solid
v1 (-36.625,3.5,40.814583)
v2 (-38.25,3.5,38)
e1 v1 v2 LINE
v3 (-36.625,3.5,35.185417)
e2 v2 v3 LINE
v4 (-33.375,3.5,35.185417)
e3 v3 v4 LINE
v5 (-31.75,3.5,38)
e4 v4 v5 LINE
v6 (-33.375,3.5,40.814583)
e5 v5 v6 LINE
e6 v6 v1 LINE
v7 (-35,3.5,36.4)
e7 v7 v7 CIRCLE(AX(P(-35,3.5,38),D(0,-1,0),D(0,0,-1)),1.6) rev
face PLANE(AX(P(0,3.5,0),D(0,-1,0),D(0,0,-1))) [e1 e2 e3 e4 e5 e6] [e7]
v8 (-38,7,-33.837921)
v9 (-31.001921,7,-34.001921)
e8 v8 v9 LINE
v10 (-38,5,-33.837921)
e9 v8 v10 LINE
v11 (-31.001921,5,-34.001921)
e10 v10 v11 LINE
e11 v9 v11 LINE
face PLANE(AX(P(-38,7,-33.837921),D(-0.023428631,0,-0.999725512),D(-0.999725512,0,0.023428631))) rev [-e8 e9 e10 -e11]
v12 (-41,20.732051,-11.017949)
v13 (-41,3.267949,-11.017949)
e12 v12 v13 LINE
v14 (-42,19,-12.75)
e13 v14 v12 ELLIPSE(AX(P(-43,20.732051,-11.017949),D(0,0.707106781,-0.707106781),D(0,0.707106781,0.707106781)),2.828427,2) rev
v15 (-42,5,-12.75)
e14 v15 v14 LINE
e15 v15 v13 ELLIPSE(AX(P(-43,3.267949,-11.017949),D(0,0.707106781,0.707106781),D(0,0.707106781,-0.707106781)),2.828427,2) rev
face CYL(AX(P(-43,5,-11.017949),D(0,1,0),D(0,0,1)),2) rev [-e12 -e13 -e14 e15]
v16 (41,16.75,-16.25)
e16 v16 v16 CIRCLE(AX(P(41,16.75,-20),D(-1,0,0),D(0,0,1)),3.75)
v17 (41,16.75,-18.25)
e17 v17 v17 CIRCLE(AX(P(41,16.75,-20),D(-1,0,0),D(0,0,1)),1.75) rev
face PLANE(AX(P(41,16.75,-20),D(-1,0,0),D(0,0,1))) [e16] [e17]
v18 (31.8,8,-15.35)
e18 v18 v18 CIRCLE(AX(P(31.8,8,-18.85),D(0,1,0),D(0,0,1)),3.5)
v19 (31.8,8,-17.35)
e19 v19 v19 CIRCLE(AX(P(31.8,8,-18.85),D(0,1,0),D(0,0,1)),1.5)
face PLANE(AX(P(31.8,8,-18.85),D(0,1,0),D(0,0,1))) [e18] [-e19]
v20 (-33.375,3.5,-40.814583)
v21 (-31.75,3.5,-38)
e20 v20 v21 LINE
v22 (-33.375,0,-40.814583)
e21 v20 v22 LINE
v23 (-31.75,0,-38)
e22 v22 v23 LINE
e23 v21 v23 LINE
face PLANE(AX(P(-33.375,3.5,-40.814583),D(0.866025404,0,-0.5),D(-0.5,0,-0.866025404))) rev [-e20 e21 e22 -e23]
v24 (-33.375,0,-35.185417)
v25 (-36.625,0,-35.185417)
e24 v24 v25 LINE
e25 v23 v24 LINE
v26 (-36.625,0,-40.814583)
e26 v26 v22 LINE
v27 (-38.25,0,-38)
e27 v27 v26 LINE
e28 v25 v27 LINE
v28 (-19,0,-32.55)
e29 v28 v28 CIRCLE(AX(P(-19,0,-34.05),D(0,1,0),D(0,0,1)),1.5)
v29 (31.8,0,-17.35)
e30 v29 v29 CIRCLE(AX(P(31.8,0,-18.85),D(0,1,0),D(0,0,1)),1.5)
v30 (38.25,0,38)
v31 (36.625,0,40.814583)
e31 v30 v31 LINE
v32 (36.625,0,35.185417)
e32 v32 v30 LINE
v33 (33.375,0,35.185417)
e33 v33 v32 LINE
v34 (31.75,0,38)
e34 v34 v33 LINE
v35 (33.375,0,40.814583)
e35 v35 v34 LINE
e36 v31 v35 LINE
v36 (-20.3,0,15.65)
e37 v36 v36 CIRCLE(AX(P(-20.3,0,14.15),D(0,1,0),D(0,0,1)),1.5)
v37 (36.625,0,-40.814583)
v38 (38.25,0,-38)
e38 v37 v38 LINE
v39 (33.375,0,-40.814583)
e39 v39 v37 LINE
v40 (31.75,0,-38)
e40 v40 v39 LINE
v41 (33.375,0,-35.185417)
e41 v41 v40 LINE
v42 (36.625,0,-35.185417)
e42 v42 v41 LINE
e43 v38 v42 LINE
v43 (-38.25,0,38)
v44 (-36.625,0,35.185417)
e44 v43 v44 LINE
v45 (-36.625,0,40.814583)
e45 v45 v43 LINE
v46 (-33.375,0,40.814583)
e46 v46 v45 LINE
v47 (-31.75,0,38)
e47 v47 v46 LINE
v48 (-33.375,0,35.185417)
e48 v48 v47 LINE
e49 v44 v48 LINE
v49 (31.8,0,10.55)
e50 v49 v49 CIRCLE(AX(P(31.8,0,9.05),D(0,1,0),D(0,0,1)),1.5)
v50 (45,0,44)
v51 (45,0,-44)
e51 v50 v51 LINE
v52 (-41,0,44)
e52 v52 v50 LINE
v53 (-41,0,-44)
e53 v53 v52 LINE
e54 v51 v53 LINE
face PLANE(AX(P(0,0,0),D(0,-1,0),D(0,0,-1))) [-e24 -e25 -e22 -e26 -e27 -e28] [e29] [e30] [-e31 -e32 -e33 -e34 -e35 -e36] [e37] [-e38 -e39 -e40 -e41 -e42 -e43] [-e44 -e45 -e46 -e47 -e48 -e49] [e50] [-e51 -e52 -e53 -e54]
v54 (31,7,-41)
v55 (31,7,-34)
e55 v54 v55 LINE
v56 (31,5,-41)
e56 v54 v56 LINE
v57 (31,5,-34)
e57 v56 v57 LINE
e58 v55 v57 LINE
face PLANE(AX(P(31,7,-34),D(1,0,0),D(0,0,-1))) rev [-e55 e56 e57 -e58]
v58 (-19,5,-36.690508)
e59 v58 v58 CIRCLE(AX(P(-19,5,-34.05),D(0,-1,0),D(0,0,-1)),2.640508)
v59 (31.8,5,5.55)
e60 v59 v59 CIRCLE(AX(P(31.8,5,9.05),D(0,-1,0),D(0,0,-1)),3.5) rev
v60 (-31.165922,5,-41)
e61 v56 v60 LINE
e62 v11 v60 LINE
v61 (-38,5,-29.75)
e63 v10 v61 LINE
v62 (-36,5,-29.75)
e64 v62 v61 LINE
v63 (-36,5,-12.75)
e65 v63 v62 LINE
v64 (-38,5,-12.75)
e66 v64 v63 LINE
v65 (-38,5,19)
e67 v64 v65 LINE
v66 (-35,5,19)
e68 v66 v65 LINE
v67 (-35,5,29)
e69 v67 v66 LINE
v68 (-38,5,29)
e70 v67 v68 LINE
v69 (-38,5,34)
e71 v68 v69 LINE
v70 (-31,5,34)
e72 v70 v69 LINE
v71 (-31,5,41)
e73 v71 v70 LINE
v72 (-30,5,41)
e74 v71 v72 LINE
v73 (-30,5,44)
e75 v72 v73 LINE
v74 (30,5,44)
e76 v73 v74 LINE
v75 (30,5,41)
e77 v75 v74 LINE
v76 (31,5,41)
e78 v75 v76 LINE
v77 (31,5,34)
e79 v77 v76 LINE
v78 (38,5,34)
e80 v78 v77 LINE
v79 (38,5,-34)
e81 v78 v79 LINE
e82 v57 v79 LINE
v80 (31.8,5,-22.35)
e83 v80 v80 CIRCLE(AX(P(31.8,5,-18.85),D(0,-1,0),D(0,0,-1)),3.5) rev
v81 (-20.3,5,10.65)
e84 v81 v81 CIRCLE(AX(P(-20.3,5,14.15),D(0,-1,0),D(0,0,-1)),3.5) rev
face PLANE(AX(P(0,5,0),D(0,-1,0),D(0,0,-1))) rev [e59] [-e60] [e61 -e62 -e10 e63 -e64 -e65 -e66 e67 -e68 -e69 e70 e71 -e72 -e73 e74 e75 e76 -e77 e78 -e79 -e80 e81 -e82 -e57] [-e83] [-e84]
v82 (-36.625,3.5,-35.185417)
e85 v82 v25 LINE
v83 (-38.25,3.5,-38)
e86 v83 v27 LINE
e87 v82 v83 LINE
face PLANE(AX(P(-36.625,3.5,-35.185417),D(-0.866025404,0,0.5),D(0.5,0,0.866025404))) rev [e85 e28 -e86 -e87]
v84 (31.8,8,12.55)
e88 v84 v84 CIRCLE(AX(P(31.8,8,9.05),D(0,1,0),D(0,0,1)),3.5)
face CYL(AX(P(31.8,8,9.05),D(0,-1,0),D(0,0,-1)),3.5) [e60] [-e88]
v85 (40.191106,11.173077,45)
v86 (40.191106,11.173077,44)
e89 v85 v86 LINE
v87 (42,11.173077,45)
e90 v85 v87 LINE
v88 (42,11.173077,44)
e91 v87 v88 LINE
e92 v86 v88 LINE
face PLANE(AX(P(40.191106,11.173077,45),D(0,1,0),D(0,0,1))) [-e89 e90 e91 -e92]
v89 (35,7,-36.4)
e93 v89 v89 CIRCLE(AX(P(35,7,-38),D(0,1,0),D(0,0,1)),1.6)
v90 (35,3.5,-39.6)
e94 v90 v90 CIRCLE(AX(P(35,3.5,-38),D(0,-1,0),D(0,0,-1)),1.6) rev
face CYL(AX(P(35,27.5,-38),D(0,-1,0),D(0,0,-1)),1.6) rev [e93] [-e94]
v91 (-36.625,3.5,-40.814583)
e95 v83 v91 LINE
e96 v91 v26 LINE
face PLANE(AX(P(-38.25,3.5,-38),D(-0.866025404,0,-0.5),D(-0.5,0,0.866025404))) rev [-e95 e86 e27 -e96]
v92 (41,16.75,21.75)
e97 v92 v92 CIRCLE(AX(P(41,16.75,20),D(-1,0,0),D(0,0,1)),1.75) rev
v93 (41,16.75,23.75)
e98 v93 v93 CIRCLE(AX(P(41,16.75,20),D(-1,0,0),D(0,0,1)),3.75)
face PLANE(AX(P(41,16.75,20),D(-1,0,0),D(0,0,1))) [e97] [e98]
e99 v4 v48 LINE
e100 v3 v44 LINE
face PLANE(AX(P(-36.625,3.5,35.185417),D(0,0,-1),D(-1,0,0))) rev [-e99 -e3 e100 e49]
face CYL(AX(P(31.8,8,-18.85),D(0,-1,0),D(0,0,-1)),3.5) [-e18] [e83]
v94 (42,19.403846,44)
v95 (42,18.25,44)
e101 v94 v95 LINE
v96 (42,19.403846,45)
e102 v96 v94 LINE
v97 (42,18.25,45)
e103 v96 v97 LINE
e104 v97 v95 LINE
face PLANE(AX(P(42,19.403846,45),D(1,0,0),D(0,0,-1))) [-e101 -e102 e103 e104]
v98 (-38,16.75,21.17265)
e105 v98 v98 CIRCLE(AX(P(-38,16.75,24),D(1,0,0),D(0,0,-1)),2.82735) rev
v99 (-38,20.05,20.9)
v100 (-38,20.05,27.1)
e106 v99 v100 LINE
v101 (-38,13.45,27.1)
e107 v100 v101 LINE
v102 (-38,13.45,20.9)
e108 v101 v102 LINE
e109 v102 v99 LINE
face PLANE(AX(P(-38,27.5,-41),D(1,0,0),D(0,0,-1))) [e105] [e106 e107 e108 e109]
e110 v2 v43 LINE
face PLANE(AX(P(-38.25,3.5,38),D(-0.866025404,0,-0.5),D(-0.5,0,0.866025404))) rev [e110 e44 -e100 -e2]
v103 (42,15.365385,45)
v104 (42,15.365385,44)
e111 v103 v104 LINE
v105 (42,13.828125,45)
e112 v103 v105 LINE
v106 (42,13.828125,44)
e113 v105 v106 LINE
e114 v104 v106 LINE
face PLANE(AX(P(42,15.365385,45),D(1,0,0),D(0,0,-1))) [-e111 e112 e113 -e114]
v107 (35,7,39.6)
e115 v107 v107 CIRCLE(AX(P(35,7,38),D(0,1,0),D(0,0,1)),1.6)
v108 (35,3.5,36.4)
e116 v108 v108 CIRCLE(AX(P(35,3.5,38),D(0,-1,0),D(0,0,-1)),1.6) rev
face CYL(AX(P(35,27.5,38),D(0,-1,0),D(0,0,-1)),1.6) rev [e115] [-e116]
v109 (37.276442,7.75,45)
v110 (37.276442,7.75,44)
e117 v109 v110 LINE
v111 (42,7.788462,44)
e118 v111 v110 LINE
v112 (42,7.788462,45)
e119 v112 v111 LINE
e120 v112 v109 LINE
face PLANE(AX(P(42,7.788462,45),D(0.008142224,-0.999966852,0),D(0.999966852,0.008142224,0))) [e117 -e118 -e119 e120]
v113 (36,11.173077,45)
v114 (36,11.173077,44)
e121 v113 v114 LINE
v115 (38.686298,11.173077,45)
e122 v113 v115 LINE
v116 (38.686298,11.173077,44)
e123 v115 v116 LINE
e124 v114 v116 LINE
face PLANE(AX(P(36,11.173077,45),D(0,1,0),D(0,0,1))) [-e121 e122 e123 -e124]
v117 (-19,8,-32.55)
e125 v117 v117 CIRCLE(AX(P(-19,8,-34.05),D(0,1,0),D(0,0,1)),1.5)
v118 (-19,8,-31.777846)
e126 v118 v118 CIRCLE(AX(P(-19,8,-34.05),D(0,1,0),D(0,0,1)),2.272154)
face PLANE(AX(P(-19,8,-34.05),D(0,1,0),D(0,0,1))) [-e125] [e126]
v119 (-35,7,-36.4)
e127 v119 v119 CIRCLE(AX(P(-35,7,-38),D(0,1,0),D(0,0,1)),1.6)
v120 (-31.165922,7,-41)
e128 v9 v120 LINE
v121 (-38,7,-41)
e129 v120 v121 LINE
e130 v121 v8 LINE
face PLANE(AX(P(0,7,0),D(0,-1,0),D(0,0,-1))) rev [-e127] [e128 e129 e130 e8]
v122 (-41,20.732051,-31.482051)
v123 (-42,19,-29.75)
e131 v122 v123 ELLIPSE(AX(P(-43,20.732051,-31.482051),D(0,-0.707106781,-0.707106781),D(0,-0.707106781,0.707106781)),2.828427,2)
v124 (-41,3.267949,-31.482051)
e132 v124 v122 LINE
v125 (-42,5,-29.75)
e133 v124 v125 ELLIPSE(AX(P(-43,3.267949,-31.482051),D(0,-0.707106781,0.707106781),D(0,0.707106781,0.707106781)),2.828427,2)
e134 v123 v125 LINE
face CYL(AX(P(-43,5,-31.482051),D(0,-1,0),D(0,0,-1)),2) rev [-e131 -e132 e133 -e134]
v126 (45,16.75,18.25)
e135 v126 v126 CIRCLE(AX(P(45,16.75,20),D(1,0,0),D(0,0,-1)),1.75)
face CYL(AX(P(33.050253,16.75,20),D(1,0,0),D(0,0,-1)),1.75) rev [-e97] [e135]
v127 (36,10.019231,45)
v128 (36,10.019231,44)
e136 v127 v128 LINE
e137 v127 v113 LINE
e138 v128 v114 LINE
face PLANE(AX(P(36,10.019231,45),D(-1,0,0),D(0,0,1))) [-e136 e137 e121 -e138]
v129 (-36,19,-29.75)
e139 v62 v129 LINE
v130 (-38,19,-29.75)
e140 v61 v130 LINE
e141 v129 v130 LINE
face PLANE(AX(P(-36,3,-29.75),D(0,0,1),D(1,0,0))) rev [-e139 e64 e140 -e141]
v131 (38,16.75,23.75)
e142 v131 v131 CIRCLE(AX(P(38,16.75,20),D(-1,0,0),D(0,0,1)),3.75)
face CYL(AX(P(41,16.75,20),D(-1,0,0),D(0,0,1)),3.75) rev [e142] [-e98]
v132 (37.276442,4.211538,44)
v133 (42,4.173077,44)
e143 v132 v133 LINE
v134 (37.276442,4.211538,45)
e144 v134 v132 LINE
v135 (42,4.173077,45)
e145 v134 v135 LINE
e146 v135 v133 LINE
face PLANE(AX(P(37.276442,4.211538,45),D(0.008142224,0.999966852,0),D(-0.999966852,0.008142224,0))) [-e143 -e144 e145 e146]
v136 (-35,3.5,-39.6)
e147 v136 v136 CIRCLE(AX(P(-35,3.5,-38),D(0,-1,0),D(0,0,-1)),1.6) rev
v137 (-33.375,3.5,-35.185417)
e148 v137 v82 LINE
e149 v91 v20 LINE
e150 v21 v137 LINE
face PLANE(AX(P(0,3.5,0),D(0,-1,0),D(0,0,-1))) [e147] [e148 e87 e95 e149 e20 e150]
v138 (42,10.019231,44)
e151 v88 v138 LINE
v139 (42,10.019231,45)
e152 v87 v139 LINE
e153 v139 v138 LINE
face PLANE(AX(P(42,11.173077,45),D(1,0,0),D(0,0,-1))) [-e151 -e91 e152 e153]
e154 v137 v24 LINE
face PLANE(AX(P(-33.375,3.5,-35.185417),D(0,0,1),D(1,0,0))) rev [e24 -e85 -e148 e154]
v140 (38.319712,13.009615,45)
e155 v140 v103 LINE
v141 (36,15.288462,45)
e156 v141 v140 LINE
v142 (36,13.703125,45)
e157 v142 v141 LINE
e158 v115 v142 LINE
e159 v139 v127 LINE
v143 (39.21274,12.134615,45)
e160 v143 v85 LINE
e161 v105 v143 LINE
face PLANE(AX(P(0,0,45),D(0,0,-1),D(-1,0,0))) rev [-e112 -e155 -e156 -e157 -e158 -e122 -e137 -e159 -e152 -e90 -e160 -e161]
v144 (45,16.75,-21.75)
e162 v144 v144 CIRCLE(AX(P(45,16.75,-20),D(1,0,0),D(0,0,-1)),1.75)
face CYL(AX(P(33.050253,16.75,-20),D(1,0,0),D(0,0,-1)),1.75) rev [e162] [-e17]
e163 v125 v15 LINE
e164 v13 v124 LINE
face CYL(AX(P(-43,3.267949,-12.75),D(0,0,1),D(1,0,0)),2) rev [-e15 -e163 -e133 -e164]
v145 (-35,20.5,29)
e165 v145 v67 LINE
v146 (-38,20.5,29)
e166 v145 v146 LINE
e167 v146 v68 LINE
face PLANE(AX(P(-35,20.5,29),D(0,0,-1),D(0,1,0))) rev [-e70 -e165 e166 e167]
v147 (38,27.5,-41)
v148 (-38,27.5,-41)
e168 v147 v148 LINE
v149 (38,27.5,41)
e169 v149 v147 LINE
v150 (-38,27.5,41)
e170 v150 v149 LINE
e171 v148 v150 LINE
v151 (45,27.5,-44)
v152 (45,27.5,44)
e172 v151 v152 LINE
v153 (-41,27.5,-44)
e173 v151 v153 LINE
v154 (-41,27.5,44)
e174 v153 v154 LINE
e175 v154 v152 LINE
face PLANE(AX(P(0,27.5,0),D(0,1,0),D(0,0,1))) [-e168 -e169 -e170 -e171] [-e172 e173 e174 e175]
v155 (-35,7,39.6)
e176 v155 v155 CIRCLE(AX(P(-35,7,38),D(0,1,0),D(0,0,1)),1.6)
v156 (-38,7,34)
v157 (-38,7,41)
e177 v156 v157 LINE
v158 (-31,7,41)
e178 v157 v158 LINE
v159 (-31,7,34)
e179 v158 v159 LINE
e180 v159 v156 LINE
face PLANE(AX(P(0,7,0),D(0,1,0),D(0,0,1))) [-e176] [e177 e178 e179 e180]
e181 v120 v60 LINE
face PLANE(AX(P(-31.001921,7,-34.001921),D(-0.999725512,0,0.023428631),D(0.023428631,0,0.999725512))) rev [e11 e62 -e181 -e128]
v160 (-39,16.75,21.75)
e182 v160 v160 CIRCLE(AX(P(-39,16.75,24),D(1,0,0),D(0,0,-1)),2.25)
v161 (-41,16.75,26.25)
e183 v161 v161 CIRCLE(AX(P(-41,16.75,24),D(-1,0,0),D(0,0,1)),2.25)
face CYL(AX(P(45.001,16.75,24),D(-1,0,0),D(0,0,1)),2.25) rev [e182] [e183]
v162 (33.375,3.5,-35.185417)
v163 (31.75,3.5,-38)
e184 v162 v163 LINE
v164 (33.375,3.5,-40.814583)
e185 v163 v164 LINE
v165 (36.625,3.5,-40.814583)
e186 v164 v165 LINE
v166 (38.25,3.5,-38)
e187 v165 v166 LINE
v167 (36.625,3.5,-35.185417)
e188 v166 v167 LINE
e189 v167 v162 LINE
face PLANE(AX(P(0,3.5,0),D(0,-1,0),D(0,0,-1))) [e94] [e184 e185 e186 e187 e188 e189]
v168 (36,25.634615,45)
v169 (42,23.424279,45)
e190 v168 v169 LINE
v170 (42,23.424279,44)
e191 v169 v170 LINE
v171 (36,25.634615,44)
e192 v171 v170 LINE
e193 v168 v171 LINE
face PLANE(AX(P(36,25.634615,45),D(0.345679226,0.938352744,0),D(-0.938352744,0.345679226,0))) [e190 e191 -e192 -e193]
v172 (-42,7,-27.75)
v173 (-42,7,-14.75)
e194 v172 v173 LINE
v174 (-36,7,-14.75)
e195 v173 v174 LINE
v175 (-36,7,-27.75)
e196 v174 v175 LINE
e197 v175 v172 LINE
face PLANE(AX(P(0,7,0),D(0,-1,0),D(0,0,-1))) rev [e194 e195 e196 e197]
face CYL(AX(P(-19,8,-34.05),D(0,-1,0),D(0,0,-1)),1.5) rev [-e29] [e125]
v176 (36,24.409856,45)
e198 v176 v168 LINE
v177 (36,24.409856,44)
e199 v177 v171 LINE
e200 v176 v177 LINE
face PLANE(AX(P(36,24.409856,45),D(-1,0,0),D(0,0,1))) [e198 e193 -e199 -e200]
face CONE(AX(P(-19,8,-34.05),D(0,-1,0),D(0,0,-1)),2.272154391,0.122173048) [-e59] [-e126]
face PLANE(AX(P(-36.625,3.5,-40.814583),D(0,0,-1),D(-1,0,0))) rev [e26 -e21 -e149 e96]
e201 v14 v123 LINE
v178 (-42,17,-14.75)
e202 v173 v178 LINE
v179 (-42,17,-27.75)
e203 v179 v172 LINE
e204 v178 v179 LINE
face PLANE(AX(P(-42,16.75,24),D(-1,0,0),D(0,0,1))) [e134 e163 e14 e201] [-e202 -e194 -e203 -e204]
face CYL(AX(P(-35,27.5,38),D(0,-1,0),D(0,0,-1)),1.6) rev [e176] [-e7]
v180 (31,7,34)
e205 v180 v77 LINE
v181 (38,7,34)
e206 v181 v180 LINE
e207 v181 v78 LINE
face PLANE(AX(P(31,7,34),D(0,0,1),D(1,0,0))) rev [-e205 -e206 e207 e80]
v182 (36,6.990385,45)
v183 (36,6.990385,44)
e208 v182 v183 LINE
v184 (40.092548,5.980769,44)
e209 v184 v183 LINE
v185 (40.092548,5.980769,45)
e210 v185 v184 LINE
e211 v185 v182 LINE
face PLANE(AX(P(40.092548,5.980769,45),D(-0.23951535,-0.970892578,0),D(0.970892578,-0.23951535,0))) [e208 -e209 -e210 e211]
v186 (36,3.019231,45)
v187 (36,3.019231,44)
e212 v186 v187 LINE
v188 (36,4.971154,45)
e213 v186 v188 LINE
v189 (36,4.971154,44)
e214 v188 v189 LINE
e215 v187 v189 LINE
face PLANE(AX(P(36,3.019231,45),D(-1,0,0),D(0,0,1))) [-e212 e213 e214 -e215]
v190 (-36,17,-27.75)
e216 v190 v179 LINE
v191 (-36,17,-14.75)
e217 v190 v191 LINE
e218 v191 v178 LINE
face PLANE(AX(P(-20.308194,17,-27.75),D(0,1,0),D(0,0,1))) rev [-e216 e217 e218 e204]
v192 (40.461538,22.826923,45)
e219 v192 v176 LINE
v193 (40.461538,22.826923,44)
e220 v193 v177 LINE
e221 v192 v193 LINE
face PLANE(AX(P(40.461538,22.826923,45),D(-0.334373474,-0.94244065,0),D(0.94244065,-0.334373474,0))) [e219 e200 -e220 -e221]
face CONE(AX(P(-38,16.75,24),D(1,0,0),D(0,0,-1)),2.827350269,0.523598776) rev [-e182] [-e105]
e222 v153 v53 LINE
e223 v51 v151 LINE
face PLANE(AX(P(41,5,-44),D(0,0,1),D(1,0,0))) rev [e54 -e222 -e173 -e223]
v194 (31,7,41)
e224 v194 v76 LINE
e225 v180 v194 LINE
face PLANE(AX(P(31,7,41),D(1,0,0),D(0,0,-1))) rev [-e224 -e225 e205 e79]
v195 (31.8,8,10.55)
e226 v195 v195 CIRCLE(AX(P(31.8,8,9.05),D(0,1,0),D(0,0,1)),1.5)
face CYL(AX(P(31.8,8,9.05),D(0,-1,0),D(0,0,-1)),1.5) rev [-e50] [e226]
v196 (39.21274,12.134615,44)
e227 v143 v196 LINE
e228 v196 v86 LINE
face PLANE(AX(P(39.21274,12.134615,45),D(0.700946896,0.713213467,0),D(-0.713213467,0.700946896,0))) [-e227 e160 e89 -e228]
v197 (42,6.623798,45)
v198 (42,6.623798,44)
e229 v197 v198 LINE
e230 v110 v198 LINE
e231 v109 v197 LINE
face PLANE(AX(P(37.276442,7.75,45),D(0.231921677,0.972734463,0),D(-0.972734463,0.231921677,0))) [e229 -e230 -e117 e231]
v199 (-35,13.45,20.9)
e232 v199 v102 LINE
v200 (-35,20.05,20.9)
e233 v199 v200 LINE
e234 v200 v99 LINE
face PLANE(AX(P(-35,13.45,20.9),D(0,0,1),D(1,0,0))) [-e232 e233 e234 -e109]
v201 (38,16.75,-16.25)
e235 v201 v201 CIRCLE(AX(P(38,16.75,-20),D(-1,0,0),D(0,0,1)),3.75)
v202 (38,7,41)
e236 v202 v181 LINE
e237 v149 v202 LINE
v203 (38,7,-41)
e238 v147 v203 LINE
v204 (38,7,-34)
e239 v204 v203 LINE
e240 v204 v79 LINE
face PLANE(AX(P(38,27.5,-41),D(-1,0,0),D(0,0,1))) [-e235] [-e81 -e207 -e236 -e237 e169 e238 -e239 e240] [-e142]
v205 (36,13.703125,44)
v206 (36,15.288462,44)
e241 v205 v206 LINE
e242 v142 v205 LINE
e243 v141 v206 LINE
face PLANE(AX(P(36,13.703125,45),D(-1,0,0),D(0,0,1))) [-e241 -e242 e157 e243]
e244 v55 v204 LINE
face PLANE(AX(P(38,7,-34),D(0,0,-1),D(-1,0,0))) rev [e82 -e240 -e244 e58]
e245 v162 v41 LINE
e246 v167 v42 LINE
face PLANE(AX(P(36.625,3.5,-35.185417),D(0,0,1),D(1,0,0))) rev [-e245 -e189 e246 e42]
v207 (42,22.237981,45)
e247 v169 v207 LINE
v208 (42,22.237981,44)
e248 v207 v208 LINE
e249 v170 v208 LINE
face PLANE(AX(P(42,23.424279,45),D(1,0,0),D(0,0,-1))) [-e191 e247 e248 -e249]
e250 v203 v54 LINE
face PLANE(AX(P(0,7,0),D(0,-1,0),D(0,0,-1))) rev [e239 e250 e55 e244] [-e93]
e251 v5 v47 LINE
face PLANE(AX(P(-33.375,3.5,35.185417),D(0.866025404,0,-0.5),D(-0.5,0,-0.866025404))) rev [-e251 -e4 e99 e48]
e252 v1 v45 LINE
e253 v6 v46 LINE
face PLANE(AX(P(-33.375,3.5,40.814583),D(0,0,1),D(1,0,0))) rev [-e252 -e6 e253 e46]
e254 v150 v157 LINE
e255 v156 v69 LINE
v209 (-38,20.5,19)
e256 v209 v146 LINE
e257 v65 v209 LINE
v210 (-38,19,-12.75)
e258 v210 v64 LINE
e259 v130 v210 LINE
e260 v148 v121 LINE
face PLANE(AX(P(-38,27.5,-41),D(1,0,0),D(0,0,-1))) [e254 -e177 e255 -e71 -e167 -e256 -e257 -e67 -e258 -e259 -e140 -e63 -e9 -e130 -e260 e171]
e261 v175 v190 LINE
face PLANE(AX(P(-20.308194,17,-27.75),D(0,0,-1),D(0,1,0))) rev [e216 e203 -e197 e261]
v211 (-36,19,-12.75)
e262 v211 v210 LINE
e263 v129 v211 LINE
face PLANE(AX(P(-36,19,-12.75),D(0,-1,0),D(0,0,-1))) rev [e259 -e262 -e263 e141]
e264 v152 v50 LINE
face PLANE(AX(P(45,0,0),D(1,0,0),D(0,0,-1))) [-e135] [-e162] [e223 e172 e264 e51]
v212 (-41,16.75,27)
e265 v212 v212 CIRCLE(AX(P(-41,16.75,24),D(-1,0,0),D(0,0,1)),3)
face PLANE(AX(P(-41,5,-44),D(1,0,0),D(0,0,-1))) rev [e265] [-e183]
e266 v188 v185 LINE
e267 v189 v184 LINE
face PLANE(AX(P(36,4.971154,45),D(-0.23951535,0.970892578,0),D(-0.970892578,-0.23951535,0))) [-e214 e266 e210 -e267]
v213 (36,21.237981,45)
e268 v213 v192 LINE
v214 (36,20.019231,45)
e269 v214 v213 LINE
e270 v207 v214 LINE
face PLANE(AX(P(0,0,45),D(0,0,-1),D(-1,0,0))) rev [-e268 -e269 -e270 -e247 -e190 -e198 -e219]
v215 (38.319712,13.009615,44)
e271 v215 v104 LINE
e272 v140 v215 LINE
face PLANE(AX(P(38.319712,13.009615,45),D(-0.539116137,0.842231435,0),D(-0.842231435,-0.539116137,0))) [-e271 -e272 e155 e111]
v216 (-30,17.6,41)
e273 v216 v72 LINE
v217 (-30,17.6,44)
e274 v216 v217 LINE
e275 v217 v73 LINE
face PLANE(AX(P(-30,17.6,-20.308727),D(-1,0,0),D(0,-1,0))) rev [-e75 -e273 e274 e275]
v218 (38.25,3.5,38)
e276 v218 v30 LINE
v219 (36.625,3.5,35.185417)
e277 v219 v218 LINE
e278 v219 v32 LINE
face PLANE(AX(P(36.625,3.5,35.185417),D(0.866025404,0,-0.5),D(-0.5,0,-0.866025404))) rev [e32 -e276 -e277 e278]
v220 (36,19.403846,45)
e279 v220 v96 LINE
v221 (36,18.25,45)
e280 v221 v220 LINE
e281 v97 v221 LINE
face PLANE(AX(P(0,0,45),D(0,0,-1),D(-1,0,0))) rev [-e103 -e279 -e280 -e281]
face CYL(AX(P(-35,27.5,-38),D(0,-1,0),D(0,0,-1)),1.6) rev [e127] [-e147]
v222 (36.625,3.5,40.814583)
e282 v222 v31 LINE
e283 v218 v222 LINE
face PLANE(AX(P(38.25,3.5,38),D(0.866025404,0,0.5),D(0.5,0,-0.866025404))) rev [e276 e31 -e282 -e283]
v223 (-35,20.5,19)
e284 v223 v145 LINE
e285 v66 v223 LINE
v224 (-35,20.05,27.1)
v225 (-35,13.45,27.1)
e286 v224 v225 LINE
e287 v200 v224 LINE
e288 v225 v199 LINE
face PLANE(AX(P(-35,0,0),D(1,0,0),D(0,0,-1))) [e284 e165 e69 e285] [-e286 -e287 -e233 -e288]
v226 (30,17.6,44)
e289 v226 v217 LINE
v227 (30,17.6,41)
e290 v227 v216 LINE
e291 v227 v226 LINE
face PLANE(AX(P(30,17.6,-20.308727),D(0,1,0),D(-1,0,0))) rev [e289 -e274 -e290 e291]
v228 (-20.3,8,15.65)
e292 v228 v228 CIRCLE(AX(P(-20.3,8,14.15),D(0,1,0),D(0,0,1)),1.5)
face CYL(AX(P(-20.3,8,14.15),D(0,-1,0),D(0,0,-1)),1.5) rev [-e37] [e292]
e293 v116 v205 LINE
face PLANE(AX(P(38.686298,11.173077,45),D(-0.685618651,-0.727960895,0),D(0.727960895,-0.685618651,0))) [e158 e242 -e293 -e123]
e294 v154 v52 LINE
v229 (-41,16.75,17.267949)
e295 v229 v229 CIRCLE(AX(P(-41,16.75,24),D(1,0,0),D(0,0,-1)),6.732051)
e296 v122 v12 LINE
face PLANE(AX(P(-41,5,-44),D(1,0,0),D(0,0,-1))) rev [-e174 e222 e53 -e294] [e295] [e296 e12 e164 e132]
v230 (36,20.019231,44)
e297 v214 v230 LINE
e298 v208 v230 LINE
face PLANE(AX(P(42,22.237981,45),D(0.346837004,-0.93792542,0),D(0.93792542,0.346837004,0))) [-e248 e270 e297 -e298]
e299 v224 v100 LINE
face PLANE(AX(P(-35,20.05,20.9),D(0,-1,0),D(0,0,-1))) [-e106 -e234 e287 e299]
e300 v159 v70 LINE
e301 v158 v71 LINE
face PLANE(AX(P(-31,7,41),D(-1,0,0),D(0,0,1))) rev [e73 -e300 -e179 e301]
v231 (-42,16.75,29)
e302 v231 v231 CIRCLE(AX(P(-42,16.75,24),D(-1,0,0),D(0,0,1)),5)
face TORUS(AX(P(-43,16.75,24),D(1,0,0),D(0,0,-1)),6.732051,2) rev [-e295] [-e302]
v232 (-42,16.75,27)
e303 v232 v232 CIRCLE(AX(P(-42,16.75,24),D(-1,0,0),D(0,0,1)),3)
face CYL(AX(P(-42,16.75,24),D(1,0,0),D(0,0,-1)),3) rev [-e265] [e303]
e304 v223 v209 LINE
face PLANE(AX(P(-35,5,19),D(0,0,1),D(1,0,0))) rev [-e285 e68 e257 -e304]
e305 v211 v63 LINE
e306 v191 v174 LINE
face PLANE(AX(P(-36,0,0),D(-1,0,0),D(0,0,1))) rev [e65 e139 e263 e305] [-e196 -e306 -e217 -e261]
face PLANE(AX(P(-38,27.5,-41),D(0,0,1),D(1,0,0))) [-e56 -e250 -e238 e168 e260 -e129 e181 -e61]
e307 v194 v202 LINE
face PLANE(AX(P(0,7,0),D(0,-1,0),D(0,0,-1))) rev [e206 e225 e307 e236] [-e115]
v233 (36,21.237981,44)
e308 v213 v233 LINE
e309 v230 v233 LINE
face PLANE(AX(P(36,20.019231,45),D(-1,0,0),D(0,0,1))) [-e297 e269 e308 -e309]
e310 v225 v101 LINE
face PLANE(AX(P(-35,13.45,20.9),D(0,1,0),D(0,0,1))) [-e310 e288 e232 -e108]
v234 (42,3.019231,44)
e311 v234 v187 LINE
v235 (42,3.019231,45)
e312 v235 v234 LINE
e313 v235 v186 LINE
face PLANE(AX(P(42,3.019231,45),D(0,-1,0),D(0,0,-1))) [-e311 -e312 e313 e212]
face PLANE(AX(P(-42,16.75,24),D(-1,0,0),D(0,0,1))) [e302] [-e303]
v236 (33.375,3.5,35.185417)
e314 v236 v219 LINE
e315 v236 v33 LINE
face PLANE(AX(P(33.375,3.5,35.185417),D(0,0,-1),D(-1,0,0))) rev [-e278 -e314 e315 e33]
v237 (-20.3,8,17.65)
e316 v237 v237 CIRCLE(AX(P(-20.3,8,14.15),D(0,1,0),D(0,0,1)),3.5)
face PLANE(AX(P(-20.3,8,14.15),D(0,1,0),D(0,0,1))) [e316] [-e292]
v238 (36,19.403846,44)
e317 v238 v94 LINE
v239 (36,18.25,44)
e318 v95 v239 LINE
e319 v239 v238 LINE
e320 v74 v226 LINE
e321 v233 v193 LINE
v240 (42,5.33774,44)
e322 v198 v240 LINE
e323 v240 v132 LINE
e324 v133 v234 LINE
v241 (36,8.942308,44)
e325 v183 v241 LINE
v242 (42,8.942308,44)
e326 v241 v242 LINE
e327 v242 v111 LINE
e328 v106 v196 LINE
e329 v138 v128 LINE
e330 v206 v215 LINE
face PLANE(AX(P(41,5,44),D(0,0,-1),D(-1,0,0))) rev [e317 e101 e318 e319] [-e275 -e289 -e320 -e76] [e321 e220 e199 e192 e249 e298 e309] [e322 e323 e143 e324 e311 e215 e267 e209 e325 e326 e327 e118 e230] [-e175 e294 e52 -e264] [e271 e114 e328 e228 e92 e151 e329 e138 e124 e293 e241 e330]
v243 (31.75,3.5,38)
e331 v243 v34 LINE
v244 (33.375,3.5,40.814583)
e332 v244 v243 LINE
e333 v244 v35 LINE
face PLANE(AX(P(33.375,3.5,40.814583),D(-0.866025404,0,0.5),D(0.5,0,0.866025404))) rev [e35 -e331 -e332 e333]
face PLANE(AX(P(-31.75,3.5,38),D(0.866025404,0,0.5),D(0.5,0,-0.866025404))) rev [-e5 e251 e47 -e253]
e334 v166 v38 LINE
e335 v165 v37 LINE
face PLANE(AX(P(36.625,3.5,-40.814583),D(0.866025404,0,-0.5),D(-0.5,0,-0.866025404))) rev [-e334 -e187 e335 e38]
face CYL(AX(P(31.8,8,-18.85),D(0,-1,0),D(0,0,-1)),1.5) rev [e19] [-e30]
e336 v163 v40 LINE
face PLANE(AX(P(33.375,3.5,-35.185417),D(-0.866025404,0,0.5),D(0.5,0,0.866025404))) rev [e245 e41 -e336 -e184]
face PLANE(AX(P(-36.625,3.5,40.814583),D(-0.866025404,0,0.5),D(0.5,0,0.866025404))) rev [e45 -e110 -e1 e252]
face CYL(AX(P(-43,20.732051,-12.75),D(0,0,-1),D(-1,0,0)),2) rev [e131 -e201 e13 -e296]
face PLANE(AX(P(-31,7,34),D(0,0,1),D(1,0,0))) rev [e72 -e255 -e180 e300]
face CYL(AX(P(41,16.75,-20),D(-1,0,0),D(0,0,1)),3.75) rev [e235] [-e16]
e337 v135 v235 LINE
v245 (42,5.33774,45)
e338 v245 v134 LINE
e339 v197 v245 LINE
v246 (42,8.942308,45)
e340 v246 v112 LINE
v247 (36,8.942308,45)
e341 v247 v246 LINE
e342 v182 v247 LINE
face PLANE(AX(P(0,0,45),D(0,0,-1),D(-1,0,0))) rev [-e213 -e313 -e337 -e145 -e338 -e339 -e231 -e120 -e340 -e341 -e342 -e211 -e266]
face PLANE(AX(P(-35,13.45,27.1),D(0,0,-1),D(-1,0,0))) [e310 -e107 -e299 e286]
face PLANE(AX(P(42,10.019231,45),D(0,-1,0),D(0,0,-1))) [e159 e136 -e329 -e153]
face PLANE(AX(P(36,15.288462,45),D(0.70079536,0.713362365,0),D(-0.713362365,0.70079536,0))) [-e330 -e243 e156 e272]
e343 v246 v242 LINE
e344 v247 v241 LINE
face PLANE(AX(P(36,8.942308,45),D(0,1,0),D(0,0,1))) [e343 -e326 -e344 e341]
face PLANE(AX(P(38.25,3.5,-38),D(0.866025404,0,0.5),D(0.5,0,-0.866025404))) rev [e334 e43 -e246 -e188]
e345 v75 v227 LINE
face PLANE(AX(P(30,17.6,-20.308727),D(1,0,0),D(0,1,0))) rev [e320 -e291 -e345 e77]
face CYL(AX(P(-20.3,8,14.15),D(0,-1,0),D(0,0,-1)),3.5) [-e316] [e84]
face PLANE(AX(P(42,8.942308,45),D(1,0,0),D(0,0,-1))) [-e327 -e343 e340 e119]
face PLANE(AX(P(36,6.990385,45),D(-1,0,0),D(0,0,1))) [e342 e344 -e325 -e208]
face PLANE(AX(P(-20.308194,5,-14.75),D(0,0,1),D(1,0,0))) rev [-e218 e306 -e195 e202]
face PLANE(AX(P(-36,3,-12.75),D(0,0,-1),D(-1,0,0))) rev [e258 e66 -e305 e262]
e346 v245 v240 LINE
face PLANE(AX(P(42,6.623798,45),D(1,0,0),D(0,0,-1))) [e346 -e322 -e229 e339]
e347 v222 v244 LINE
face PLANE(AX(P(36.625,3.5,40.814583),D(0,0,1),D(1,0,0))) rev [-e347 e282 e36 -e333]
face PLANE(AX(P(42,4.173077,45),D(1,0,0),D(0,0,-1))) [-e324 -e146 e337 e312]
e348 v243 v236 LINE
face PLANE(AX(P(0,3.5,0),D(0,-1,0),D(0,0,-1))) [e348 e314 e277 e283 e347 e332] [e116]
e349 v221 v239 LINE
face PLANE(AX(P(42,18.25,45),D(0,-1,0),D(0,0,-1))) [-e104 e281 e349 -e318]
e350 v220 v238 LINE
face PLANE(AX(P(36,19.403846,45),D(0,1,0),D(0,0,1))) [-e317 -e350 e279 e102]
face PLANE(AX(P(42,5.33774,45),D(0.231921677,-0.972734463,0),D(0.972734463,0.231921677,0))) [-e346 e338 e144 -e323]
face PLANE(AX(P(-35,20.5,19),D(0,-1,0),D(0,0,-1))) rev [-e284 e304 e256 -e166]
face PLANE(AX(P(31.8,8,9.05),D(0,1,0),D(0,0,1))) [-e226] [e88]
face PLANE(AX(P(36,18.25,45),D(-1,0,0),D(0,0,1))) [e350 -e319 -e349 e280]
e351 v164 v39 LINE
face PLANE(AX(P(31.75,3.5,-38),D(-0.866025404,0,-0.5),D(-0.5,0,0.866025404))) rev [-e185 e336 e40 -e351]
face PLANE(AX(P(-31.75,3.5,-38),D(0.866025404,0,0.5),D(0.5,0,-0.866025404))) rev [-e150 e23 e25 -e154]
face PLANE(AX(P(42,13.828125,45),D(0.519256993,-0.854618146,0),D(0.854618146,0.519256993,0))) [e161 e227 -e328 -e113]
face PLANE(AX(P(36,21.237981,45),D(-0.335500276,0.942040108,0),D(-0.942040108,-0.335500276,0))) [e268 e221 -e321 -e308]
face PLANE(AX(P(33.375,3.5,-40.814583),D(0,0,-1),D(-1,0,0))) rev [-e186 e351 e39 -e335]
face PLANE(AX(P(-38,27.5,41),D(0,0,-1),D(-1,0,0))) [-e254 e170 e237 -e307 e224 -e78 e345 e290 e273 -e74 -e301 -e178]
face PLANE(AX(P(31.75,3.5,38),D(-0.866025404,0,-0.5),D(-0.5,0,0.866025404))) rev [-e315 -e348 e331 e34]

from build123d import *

# Parameters (mm, degrees)
SKETCH1_W            = 82
SKETCH1_H            = 88
BOSS_EXTRUDE1_DEPTH  = 5
SKETCH2_W            = 82
SKETCH2_H            = 88
SKETCH2_W_2          = 76
SKETCH2_H_2          = 82
BOSS_EXTRUDE2_DEPTH  = 22.5
SKETCH_1_R           = 3.5
SKETCH_1_R_2         = 1.5
BOSS_EXTRUDE3_DEPTH  = 3
SKETCH4_W            = 13
SKETCH4_H            = 12
CUT_EXTRUDE1_DEPTH   = 3
SKETCH7_R            = 1.6
CUT_EXTRUDE3_DEPTH   = 67.130552697
CUT_EXTRUDE4_DEPTH   = 3.5
SKETCH10_W           = 17
SKETCH10_H           = 16
SKETCH10_W_2         = 13
SKETCH10_H_2         = 12
BOSS_EXTRUDE6_DEPTH  = 2
CHAMFER1_SIZE        = 10
CHAMFER1_SIZE_2      = 1.227845609
SKETCH11_R           = 1.5
CUT_EXTRUDE5_DEPTH   = 65.212537717
SKETCH12_W           = 60
SKETCH12_H           = 12.6
CUT_EXTRUDE6_DEPTH   = 3
SKETCH13_R           = 1.75
CUT_EXTRUDE7_DEPTH   = 3
BOSS_EXTRUDE7_START  = 4
SKETCH14_W           = 88
SKETCH14_H           = 27.5
SKETCH14_R           = 1.75
BOSS_EXTRUDE7_DEPTH  = 4
SKETCH15_R           = 3.75
CUT_EXTRUDE8_DEPTH   = 3
CUT_EXTRUDE9_REACH   = 102.44
SKETCH16_R           = 2.25
SKETCH17_W           = 10
SKETCH17_H           = 15.5
SKETCH17_W_2         = 6.2
SKETCH17_H_2         = 6.6
BOSS_EXTRUDE8_DEPTH  = 3
CHAMFER2_SIZE        = 1
CHAMFER2_SIZE2       = 0.577350269
SKETCH20_R           = 5
SKETCH20_R_2         = 3
BOSS_EXTRUDE10_DEPTH = 1
FILLET3_R            = 2
SKETCH21_W           = 5
SKETCH21_H           = 13
BOSS_EXTRUDE11_DEPTH = 2
SKETCH22_W           = 6
SKETCH22_H           = 1.153846154
BOSS_EXTRUDE12_DEPTH = 1
SKETCH23_W           = 7
SKETCH23_H           = 7
SKETCH23_R           = 1.6
BOSS_EXTRUDE13_DEPTH = 2
SKETCH25_W           = 17
SKETCH25_H           = 14
SKETCH25_W_2         = 13
SKETCH25_H_2         = 10
BOSS_EXTRUDE15_DEPTH = 1
FILLET4_R            = 2


with BuildPart() as part:
    # Sketch1 → Boss-Extrude1 (new body)
    with BuildSketch(Plane(origin=(0, 0, 0), x_dir=(1, 0, 0), z_dir=(0, 1, 0))):
        Rectangle(SKETCH1_W, SKETCH1_H)
    extrude(amount=BOSS_EXTRUDE1_DEPTH)

    # Sketch2 → Boss-Extrude2 (add)
    with BuildSketch(Plane(origin=(0, 5, 0), x_dir=(1, 0, 0), z_dir=(0, 1, 0))):
        Rectangle(SKETCH2_W, SKETCH2_H)
        Rectangle(SKETCH2_W_2, SKETCH2_H_2, mode=Mode.SUBTRACT)
    extrude(amount=BOSS_EXTRUDE2_DEPTH)

    # Эскиз1 → Boss-Extrude3 (add)
    # profile 1 of 4: a face of its own
    with BuildSketch(Plane(origin=(0, 5, 0), x_dir=(1, 0, 0), z_dir=(0, 1, 0))):
        with Locations(Location((-20.3, -14.15, 0), (0, 0, 90))):
            Circle(SKETCH_1_R)
        with Locations(Location((-20.3, -14.15, 0), (0, 0, 270))):
            Circle(SKETCH_1_R_2, mode=Mode.SUBTRACT)
    # profile 2 of 4: a face of its own
    with BuildSketch(Plane(origin=(0, 5, 0), x_dir=(1, 0, 0), z_dir=(0, 1, 0))):
        with Locations(Location((-19, 34.05, 0), (0, 0, 90))):
            Circle(SKETCH_1_R)
        with Locations(Location((-19, 34.05, 0), (0, 0, 270))):
            Circle(SKETCH_1_R_2, mode=Mode.SUBTRACT)
    # profile 3 of 4: a face of its own
    with BuildSketch(Plane(origin=(0, 5, 0), x_dir=(1, 0, 0), z_dir=(0, 1, 0))):
        with Locations(Location((31.8, 18.85, 0), (0, 0, 90))):
            Circle(SKETCH_1_R)
        with Locations(Location((31.8, 18.85, 0), (0, 0, 270))):
            Circle(SKETCH_1_R_2, mode=Mode.SUBTRACT)
    # profile 4 of 4: a face of its own
    with BuildSketch(Plane(origin=(0, 5, 0), x_dir=(1, 0, 0), z_dir=(0, 1, 0))):
        with Locations(Location((31.8, -9.05, 0), (0, 0, 90))):
            Circle(SKETCH_1_R)
        with Locations(Location((31.8, -9.05, 0), (0, 0, 270))):
            Circle(SKETCH_1_R_2, mode=Mode.SUBTRACT)
    extrude(amount=BOSS_EXTRUDE3_DEPTH)

    # Sketch4 → Cut-Extrude1 (cut)
    with BuildSketch(Plane.ZY.offset(41)):
        with Locations((-21.25, 11)):
            Rectangle(SKETCH4_W, SKETCH4_H)
    extrude(amount=-CUT_EXTRUDE1_DEPTH, mode=Mode.SUBTRACT)

    # Sketch7 → Cut-Extrude3 (cut, through all)
    with BuildSketch(Plane.XZ):
        with Locations(Location((35, -38, 0), (0, 0, 270))):
            Circle(SKETCH7_R)
        with Locations(Location((-35, -38, 0), (0, 0, 270))):
            Circle(SKETCH7_R)
        with Locations(Location((-35, 38, 0), (0, 0, 270))):
            Circle(SKETCH7_R)
        with Locations(Location((35, 38, 0), (0, 0, 270))):
            Circle(SKETCH7_R)
    extrude(amount=-CUT_EXTRUDE3_DEPTH, mode=Mode.SUBTRACT)

    # Sketch8 → Cut-Extrude4 (cut)
    with BuildSketch(Plane.XZ):
        Polygon((33.375, 35.185417438), (36.625, 35.185417438), (38.25, 38), (36.625, 40.814582562), (33.375, 40.814582562), (31.75, 38), align=None)
        Polygon((33.375, -35.185417438), (31.75, -38), (33.375, -40.814582562), (36.625, -40.814582562), (38.25, -38), (36.625, -35.185417438), align=None)
        Polygon((-36.625, -35.185417438), (-38.25, -38), (-36.625, -40.814582562), (-33.375, -40.814582562), (-31.75, -38), (-33.375, -35.185417438), align=None)
        Polygon((-36.625, 35.185417438), (-33.375, 35.185417438), (-31.75, 38), (-33.375, 40.814582562), (-36.625, 40.814582562), (-38.25, 38), align=None)
    extrude(amount=-CUT_EXTRUDE4_DEPTH, mode=Mode.SUBTRACT)

    # Sketch10 → Boss-Extrude6 (add)
    with BuildSketch(Plane(origin=(-38, 0, 0), x_dir=(0, 0, -1), z_dir=(1, 0, 0))):
        with Locations((21.25, 11)):
            Rectangle(SKETCH10_W, SKETCH10_H)
        with Locations((21.25, 11)):
            Rectangle(SKETCH10_W_2, SKETCH10_H_2, mode=Mode.SUBTRACT)
    extrude(amount=BOSS_EXTRUDE6_DEPTH)

    # Chamfer1
    # the kernel refuses this chamfer: 10, 1.227845609 mm, written as the material it takes off along each edge
    with BuildSketch(Plane(origin=(-19, 8, -34.05), x_dir=(0, 0, -1), z_dir=(1, 0, 0))) as chamfer1_piece_1_section:
        Polygon((3.5, -CHAMFER1_SIZE), (3.5 - CHAMFER1_SIZE_2, 0), (3.5, 0), align=None)
    chamfer1_piece_1 = revolve(axis=Axis((-19, 8, -34.05), (0, 1, 0)), mode=Mode.PRIVATE)
    chamfer1_piece_1 = split(chamfer1_piece_1, bisect_by=Plane(origin=(-19, 5, -31.575672909), z_dir=(0, 1, 0)), keep=Keep.TOP, mode=Mode.PRIVATE)
    add(chamfer1_piece_1, mode=Mode.SUBTRACT)

    # Sketch11 → Cut-Extrude5 (cut, through all)
    with BuildSketch(Plane(origin=(0, 5, 0), x_dir=(1, 0, 0), z_dir=(0, 1, 0))):
        with Locations(Location((-20.3, -14.15, 0), (0, 0, 270))):
            Circle(SKETCH11_R)
        with Locations(Location((-19, 34.05, 0), (0, 0, 270))):
            Circle(SKETCH11_R)
        with Locations(Location((31.8, -9.05, 0), (0, 0, 270))):
            Circle(SKETCH11_R)
        with Locations(Location((31.8, 18.85, 0), (0, 0, 270))):
            Circle(SKETCH11_R)
    extrude(amount=-CUT_EXTRUDE5_DEPTH, mode=Mode.SUBTRACT)

    # Sketch12 → Cut-Extrude6 (cut)
    with BuildSketch(Plane.XY.offset(44)):
        with Locations((0, 11.3)):
            Rectangle(SKETCH12_W, SKETCH12_H)
    extrude(amount=-CUT_EXTRUDE6_DEPTH, mode=Mode.SUBTRACT)

    # Sketch13 → Cut-Extrude7 (cut)
    with BuildSketch(Plane(origin=(41, 0, 0), x_dir=(0, 0, -1), z_dir=(1, 0, 0))):
        with Locations((-20, 16.75)):
            Circle(SKETCH13_R)
        with Locations((20, 16.75)):
            Circle(SKETCH13_R)
    extrude(amount=-CUT_EXTRUDE7_DEPTH, mode=Mode.SUBTRACT)

    # Sketch14 → Boss-Extrude7 (add)
    with BuildSketch(Plane(origin=(41, 0, 0), x_dir=(0, 0, -1), z_dir=(1, 0, 0)).offset(BOSS_EXTRUDE7_START)):
        with Locations((0, 13.75)):
            Rectangle(SKETCH14_W, SKETCH14_H)
        with Locations((-20, 16.75)):
            Circle(SKETCH14_R, mode=Mode.SUBTRACT)
        with Locations((20, 16.75)):
            Circle(SKETCH14_R, mode=Mode.SUBTRACT)
    extrude(amount=-BOSS_EXTRUDE7_DEPTH)

    # Sketch15 → Cut-Extrude8 (cut)
    with BuildSketch(Plane.ZY.offset(-38)):
        with Locations((20, 16.75)):
            Circle(SKETCH15_R)
        with Locations((-20, 16.75)):
            Circle(SKETCH15_R)
    extrude(amount=-CUT_EXTRUDE8_DEPTH, mode=Mode.SUBTRACT)

    # Sketch16 → Cut-Extrude9 (cut, up to next)
    with BuildSketch(Plane.ZY.offset(41), mode=Mode.PRIVATE) as cut_extrude9_sk1:
        with Locations((24, 16.75)):
            Circle(SKETCH16_R)
    cut_extrude9_tool1 = extrude(cut_extrude9_sk1.sketch, amount=-CUT_EXTRUDE9_REACH, mode=Mode.PRIVATE) & part.part
    add(cut_extrude9_tool1.solids().sort_by_distance((-41, 16.75, 24))[0], mode=Mode.SUBTRACT)

    # Sketch17 → Boss-Extrude8 (add)
    with BuildSketch(Plane(origin=(-38, 0, 0), x_dir=(0, 0, -1), z_dir=(1, 0, 0))):
        with Locations((-24, 12.75)):
            Rectangle(SKETCH17_W, SKETCH17_H)
        with Locations((-24, 16.75)):
            Rectangle(SKETCH17_W_2, SKETCH17_H_2, mode=Mode.SUBTRACT)
    extrude(amount=BOSS_EXTRUDE8_DEPTH)

    # Chamfer2
    chamfer2_edges = [part.edges().sort_by_distance(p)[0] for p in [
        (-38, 16.75, 21.75),
    ]]
    chamfer2_side = [part.faces().sort_by_distance(p)[0] for p in [
        (-39.5, 16.75, 21.75),
    ]]
    chamfer(chamfer2_edges, length=CHAMFER2_SIZE, length2=CHAMFER2_SIZE2, reference=chamfer2_side[0])

    # Sketch20 → Boss-Extrude10 (add)
    with BuildSketch(Plane.ZY.offset(41)):
        with Locations(Location((24, 16.75, 0), (0, 0, 180))):
            Circle(SKETCH20_R)
        with Locations((24, 16.75)):
            Circle(SKETCH20_R_2, mode=Mode.SUBTRACT)
    extrude(amount=BOSS_EXTRUDE10_DEPTH)

    # Fillet3
    # the kernel refuses this fillet: 2 mm, written as the material it adds along each edge
    with BuildSketch(Plane(origin=(-41, 16.75, 24), x_dir=(0, 0, -1), z_dir=(0, 1, 0))) as fillet3_piece_1:
        with BuildLine():
            CenterArc((6.732050808, 2), FILLET3_R, 210, 60)
            Line((6.732050808, 0), (6.732050808, -0.04))
            Line((6.732050808, -0.04), (5, -0.04))
            Line((5, -0.04), (4.96, 0))
            ThreePointArc((4.96, 0), (4.96, 0.5), (4.965358984, 0.98))
            Line((4.965358984, 0.98), (5, 1))
        make_face()
    revolve(axis=Axis((-41, 16.75, 24), (-1, 0, 0)))

    # Sketch21 → Boss-Extrude11 (add)
    with BuildSketch(Plane(origin=(0, 5, 0), x_dir=(1, 0, 0), z_dir=(0, 1, 0))):
        with Locations((-38.5, 21.25)):
            Rectangle(SKETCH21_W, SKETCH21_H)
    extrude(amount=BOSS_EXTRUDE11_DEPTH)

    # Sketch22 → Boss-Extrude12 (add)
    with BuildSketch(Plane.XY.offset(44)):
        Polygon((42, 3.019230769), (36, 3.019230769), (36, 4.971153846), (40.092548077, 5.980769231), (36, 6.990384615), (36, 8.942307692), (42, 8.942307692), (42, 7.788461538), (37.276442308, 7.75), (42, 6.623798077), (42, 5.337740385), (37.276442308, 4.211538462), (42, 4.173076923), align=None)
        Polygon((42, 10.019230769), (36, 10.019230769), (36, 11.173076923), (38.686298077, 11.173076923), (36, 13.703125), (36, 15.288461538), (38.319711538, 13.009615385), (42, 15.365384615), (42, 13.828125), (39.212740385, 12.134615385), (40.191105769, 11.173076923), (42, 11.173076923), align=None)
        with Locations((39, 18.826923077)):
            Rectangle(SKETCH22_W, SKETCH22_H)
        Polygon((42, 22.237980769), (36, 20.019230769), (36, 21.237980769), (40.461538462, 22.826923077), (36, 24.409855769), (36, 25.634615385), (42, 23.424278846), align=None)
    extrude(amount=BOSS_EXTRUDE12_DEPTH)

    # Sketch23 → Boss-Extrude13 (add)
    # profile 1 of 4: a face of its own
    with BuildSketch(Plane(origin=(0, 5, 0), x_dir=(1, 0, 0), z_dir=(0, 1, 0))):
        with Locations((-34.5, -37.5)):
            Rectangle(SKETCH23_W, SKETCH23_H)
        with Locations(Location((-35, -38, 0), (0, 0, 90))):
            Circle(SKETCH23_R, mode=Mode.SUBTRACT)
    # profile 2 of 4: a face of its own
    with BuildSketch(Plane(origin=(0, 5, 0), x_dir=(1, 0, 0), z_dir=(0, 1, 0))):
        with Locations((34.5, -37.5)):
            Rectangle(SKETCH23_W, SKETCH23_H)
        with Locations(Location((35, -38, 0), (0, 0, 90))):
            Circle(SKETCH23_R, mode=Mode.SUBTRACT)
    # profile 3 of 4: a face of its own
    with BuildSketch(Plane(origin=(0, 5, 0), x_dir=(1, 0, 0), z_dir=(0, 1, 0))):
        with Locations((34.5, 37.5)):
            Rectangle(SKETCH23_W, SKETCH23_H)
        with Locations(Location((35, 38, 0), (0, 0, 90))):
            Circle(SKETCH23_R, mode=Mode.SUBTRACT)
    # profile 4 of 4: a face of its own
    with BuildSketch(Plane(origin=(0, 5, 0), x_dir=(1, 0, 0), z_dir=(0, 1, 0))):
        Polygon((-38, 33.837921002), (-31.001921416, 34.001921416), (-31.16592183, 41), (-38, 41), align=None)
        with Locations(Location((-35, 38, 0), (0, 0, 90))):
            Circle(SKETCH23_R, mode=Mode.SUBTRACT)
    extrude(amount=BOSS_EXTRUDE13_DEPTH)

    # Sketch25 → Boss-Extrude15 (add)
    with BuildSketch(Plane.ZY.offset(41)):
        with Locations((-21.25, 12)):
            Rectangle(SKETCH25_W, SKETCH25_H)
        with Locations((-21.25, 12)):
            Rectangle(SKETCH25_W_2, SKETCH25_H_2, mode=Mode.SUBTRACT)
    extrude(amount=BOSS_EXTRUDE15_DEPTH)

    # Fillet4
    # the kernel refuses this fillet: 2 mm, written as the material it adds along each edge
    with BuildSketch(Plane(origin=(-41, 19, -29.75), x_dir=(0, 1, 0), z_dir=(0, 0, 1)), Plane(origin=(-41, 5, -12.75), x_dir=(0, -1, 0), z_dir=(0, 0, -1))) as fillet4_piece_1:
        with BuildLine():
            CenterArc((1.732050808, 2), FILLET4_R, 210, 60)
            Line((0, 1), (-0.034641016, 0.98))
            ThreePointArc((-0.034641016, 0.98), (-0.04, 0.5), (-0.04, 0))
            Line((-0.04, 0), (0, -0.04))
            Line((0, -0.04), (1.732050808, -0.04))
            Line((1.732050808, -0.04), (1.732050808, 0))
        make_face()
    extrude(amount=17)
    with BuildSketch(Plane(origin=(-41, 5, -29.75), x_dir=(0, 0, -1), z_dir=(0, 1, 0)), Plane(origin=(-41, 19, -12.75), x_dir=(0, 0, 1), z_dir=(0, -1, 0))) as fillet4_piece_2:
        with BuildLine():
            CenterArc((1.732050808, 2), FILLET4_R, 210, 60)
            Line((0, 1), (-0.034641016, 0.98))
            ThreePointArc((-0.034641016, 0.98), (-0.04, 0.5), (-0.04, 0))
            Line((-0.04, 0), (0, -0.04))
            Line((0, -0.04), (1.732050808, -0.04))
            Line((1.732050808, -0.04), (1.732050808, 0))
        make_face()
    extrude(amount=14)
    with BuildSketch(Plane(origin=(-41, 5, -29.75), x_dir=(0, 0, -1), z_dir=(0, 1, 0))) as fillet4_piece_3a_section:
        with BuildLine():
            CenterArc((1.732050808, 2), FILLET4_R, 210, 60)
            Line((0, 1), (-0.034641016, 0.98))
            ThreePointArc((-0.034641016, 0.98), (-0.04, 0.5), (-0.04, 0))
            Line((-0.04, 0), (0, -0.04))
            Line((0, -0.04), (1.732050808, -0.04))
            Line((1.732050808, -0.04), (1.732050808, 0))
        make_face()
    fillet4_piece_3a = extrude(amount=18.330127019, mode=Mode.PRIVATE)
    fillet4_piece_3a = split(fillet4_piece_3a, bisect_by=Plane(origin=(-41.259033422, 19, -30.182620892), z_dir=(0, 1, 0)), keep=Keep.TOP, mode=Mode.PRIVATE)
    with BuildSketch(Plane(origin=(-41, 19, -34.080127019), x_dir=(0, 1, 0), z_dir=(0, 0, 1))) as fillet4_piece_3b_section:
        with BuildLine():
            CenterArc((1.732050808, 2), FILLET4_R, 210, 60)
            Line((0, 1), (-0.034641016, 0.98))
            ThreePointArc((-0.034641016, 0.98), (-0.04, 0.5), (-0.04, 0))
            Line((-0.04, 0), (0, -0.04))
            Line((0, -0.04), (1.732050808, -0.04))
            Line((1.732050808, -0.04), (1.732050808, 0))
        make_face()
    fillet4_piece_3b = extrude(amount=21.330127019, mode=Mode.PRIVATE)
    fillet4_piece_3b = split(fillet4_piece_3b, bisect_by=Plane(origin=(-41.259033422, 19.432620892, -29.75), z_dir=(0, 0, -1)), keep=Keep.TOP, mode=Mode.PRIVATE)
    fillet4_piece_3 = fillet4_piece_3a & fillet4_piece_3b
    add(fillet4_piece_3)
    with BuildSketch(Plane(origin=(-41, 19, -29.75), x_dir=(0, 1, 0), z_dir=(0, 0, 1))) as fillet4_piece_4a_section:
        with BuildLine():
            CenterArc((1.732050808, 2), FILLET4_R, 210, 60)
            Line((0, 1), (-0.034641016, 0.98))
            ThreePointArc((-0.034641016, 0.98), (-0.04, 0.5), (-0.04, 0))
            Line((-0.04, 0), (0, -0.04))
            Line((0, -0.04), (1.732050808, -0.04))
            Line((1.732050808, -0.04), (1.732050808, 0))
        make_face()
    fillet4_piece_4a = extrude(amount=21.330127019, mode=Mode.PRIVATE)
    fillet4_piece_4a = split(fillet4_piece_4a, bisect_by=Plane(origin=(-41.259033422, 19.432620892, -12.75), z_dir=(0, 0, 1)), keep=Keep.TOP, mode=Mode.PRIVATE)
    with BuildSketch(Plane(origin=(-41, 23.330127019, -12.75), x_dir=(0, 0, 1), z_dir=(0, -1, 0))) as fillet4_piece_4b_section:
        with BuildLine():
            CenterArc((1.732050808, 2), FILLET4_R, 210, 60)
            Line((0, 1), (-0.034641016, 0.98))
            ThreePointArc((-0.034641016, 0.98), (-0.04, 0.5), (-0.04, 0))
            Line((-0.04, 0), (0, -0.04))
            Line((0, -0.04), (1.732050808, -0.04))
            Line((1.732050808, -0.04), (1.732050808, 0))
        make_face()
    fillet4_piece_4b = extrude(amount=18.330127019, mode=Mode.PRIVATE)
    fillet4_piece_4b = split(fillet4_piece_4b, bisect_by=Plane(origin=(-41.259033422, 19, -12.317379108), z_dir=(0, 1, 0)), keep=Keep.TOP, mode=Mode.PRIVATE)
    fillet4_piece_4 = fillet4_piece_4a & fillet4_piece_4b
    add(fillet4_piece_4)
    with BuildSketch(Plane(origin=(-41, 5, -12.75), x_dir=(0, -1, 0), z_dir=(0, 0, -1))) as fillet4_piece_5a_section:
        with BuildLine():
            CenterArc((1.732050808, 2), FILLET4_R, 210, 60)
            Line((0, 1), (-0.034641016, 0.98))
            ThreePointArc((-0.034641016, 0.98), (-0.04, 0.5), (-0.04, 0))
            Line((-0.04, 0), (0, -0.04))
            Line((0, -0.04), (1.732050808, -0.04))
            Line((1.732050808, -0.04), (1.732050808, 0))
        make_face()
    fillet4_piece_5a = extrude(amount=21.330127019, mode=Mode.PRIVATE)
    fillet4_piece_5a = split(fillet4_piece_5a, bisect_by=Plane(origin=(-41.259033422, 4.567379108, -29.75), z_dir=(0, 0, -1)), keep=Keep.TOP, mode=Mode.PRIVATE)
    with BuildSketch(Plane(origin=(-41, 0.669872981, -29.75), x_dir=(0, 0, -1), z_dir=(0, 1, 0))) as fillet4_piece_5b_section:
        with BuildLine():
            CenterArc((1.732050808, 2), FILLET4_R, 210, 60)
            Line((0, 1), (-0.034641016, 0.98))
            ThreePointArc((-0.034641016, 0.98), (-0.04, 0.5), (-0.04, 0))
            Line((-0.04, 0), (0, -0.04))
            Line((0, -0.04), (1.732050808, -0.04))
            Line((1.732050808, -0.04), (1.732050808, 0))
        make_face()
    fillet4_piece_5b = extrude(amount=18.330127019, mode=Mode.PRIVATE)
    fillet4_piece_5b = split(fillet4_piece_5b, bisect_by=Plane(origin=(-41.259033422, 5, -30.182620892), z_dir=(0, -1, 0)), keep=Keep.TOP, mode=Mode.PRIVATE)
    fillet4_piece_5 = fillet4_piece_5a & fillet4_piece_5b
    add(fillet4_piece_5)
    with BuildSketch(Plane(origin=(-41, 5, -8.419872981), x_dir=(0, -1, 0), z_dir=(0, 0, -1))) as fillet4_piece_6a_section:
        with BuildLine():
            CenterArc((1.732050808, 2), FILLET4_R, 210, 60)
            Line((0, 1), (-0.034641016, 0.98))
            ThreePointArc((-0.034641016, 0.98), (-0.04, 0.5), (-0.04, 0))
            Line((-0.04, 0), (0, -0.04))
            Line((0, -0.04), (1.732050808, -0.04))
            Line((1.732050808, -0.04), (1.732050808, 0))
        make_face()
    fillet4_piece_6a = extrude(amount=21.330127019, mode=Mode.PRIVATE)
    fillet4_piece_6a = split(fillet4_piece_6a, bisect_by=Plane(origin=(-41.259033422, 4.567379108, -12.75), z_dir=(0, 0, 1)), keep=Keep.TOP, mode=Mode.PRIVATE)
    with BuildSketch(Plane(origin=(-41, 19, -12.75), x_dir=(0, 0, 1), z_dir=(0, -1, 0))) as fillet4_piece_6b_section:
        with BuildLine():
            CenterArc((1.732050808, 2), FILLET4_R, 210, 60)
            Line((0, 1), (-0.034641016, 0.98))
            ThreePointArc((-0.034641016, 0.98), (-0.04, 0.5), (-0.04, 0))
            Line((-0.04, 0), (0, -0.04))
            Line((0, -0.04), (1.732050808, -0.04))
            Line((1.732050808, -0.04), (1.732050808, 0))
        make_face()
    fillet4_piece_6b = extrude(amount=18.330127019, mode=Mode.PRIVATE)
    fillet4_piece_6b = split(fillet4_piece_6b, bisect_by=Plane(origin=(-41.259033422, 5, -12.317379108), z_dir=(0, -1, 0)), keep=Keep.TOP, mode=Mode.PRIVATE)
    fillet4_piece_6 = fillet4_piece_6a & fillet4_piece_6b
    add(fillet4_piece_6)


solid = part.part
